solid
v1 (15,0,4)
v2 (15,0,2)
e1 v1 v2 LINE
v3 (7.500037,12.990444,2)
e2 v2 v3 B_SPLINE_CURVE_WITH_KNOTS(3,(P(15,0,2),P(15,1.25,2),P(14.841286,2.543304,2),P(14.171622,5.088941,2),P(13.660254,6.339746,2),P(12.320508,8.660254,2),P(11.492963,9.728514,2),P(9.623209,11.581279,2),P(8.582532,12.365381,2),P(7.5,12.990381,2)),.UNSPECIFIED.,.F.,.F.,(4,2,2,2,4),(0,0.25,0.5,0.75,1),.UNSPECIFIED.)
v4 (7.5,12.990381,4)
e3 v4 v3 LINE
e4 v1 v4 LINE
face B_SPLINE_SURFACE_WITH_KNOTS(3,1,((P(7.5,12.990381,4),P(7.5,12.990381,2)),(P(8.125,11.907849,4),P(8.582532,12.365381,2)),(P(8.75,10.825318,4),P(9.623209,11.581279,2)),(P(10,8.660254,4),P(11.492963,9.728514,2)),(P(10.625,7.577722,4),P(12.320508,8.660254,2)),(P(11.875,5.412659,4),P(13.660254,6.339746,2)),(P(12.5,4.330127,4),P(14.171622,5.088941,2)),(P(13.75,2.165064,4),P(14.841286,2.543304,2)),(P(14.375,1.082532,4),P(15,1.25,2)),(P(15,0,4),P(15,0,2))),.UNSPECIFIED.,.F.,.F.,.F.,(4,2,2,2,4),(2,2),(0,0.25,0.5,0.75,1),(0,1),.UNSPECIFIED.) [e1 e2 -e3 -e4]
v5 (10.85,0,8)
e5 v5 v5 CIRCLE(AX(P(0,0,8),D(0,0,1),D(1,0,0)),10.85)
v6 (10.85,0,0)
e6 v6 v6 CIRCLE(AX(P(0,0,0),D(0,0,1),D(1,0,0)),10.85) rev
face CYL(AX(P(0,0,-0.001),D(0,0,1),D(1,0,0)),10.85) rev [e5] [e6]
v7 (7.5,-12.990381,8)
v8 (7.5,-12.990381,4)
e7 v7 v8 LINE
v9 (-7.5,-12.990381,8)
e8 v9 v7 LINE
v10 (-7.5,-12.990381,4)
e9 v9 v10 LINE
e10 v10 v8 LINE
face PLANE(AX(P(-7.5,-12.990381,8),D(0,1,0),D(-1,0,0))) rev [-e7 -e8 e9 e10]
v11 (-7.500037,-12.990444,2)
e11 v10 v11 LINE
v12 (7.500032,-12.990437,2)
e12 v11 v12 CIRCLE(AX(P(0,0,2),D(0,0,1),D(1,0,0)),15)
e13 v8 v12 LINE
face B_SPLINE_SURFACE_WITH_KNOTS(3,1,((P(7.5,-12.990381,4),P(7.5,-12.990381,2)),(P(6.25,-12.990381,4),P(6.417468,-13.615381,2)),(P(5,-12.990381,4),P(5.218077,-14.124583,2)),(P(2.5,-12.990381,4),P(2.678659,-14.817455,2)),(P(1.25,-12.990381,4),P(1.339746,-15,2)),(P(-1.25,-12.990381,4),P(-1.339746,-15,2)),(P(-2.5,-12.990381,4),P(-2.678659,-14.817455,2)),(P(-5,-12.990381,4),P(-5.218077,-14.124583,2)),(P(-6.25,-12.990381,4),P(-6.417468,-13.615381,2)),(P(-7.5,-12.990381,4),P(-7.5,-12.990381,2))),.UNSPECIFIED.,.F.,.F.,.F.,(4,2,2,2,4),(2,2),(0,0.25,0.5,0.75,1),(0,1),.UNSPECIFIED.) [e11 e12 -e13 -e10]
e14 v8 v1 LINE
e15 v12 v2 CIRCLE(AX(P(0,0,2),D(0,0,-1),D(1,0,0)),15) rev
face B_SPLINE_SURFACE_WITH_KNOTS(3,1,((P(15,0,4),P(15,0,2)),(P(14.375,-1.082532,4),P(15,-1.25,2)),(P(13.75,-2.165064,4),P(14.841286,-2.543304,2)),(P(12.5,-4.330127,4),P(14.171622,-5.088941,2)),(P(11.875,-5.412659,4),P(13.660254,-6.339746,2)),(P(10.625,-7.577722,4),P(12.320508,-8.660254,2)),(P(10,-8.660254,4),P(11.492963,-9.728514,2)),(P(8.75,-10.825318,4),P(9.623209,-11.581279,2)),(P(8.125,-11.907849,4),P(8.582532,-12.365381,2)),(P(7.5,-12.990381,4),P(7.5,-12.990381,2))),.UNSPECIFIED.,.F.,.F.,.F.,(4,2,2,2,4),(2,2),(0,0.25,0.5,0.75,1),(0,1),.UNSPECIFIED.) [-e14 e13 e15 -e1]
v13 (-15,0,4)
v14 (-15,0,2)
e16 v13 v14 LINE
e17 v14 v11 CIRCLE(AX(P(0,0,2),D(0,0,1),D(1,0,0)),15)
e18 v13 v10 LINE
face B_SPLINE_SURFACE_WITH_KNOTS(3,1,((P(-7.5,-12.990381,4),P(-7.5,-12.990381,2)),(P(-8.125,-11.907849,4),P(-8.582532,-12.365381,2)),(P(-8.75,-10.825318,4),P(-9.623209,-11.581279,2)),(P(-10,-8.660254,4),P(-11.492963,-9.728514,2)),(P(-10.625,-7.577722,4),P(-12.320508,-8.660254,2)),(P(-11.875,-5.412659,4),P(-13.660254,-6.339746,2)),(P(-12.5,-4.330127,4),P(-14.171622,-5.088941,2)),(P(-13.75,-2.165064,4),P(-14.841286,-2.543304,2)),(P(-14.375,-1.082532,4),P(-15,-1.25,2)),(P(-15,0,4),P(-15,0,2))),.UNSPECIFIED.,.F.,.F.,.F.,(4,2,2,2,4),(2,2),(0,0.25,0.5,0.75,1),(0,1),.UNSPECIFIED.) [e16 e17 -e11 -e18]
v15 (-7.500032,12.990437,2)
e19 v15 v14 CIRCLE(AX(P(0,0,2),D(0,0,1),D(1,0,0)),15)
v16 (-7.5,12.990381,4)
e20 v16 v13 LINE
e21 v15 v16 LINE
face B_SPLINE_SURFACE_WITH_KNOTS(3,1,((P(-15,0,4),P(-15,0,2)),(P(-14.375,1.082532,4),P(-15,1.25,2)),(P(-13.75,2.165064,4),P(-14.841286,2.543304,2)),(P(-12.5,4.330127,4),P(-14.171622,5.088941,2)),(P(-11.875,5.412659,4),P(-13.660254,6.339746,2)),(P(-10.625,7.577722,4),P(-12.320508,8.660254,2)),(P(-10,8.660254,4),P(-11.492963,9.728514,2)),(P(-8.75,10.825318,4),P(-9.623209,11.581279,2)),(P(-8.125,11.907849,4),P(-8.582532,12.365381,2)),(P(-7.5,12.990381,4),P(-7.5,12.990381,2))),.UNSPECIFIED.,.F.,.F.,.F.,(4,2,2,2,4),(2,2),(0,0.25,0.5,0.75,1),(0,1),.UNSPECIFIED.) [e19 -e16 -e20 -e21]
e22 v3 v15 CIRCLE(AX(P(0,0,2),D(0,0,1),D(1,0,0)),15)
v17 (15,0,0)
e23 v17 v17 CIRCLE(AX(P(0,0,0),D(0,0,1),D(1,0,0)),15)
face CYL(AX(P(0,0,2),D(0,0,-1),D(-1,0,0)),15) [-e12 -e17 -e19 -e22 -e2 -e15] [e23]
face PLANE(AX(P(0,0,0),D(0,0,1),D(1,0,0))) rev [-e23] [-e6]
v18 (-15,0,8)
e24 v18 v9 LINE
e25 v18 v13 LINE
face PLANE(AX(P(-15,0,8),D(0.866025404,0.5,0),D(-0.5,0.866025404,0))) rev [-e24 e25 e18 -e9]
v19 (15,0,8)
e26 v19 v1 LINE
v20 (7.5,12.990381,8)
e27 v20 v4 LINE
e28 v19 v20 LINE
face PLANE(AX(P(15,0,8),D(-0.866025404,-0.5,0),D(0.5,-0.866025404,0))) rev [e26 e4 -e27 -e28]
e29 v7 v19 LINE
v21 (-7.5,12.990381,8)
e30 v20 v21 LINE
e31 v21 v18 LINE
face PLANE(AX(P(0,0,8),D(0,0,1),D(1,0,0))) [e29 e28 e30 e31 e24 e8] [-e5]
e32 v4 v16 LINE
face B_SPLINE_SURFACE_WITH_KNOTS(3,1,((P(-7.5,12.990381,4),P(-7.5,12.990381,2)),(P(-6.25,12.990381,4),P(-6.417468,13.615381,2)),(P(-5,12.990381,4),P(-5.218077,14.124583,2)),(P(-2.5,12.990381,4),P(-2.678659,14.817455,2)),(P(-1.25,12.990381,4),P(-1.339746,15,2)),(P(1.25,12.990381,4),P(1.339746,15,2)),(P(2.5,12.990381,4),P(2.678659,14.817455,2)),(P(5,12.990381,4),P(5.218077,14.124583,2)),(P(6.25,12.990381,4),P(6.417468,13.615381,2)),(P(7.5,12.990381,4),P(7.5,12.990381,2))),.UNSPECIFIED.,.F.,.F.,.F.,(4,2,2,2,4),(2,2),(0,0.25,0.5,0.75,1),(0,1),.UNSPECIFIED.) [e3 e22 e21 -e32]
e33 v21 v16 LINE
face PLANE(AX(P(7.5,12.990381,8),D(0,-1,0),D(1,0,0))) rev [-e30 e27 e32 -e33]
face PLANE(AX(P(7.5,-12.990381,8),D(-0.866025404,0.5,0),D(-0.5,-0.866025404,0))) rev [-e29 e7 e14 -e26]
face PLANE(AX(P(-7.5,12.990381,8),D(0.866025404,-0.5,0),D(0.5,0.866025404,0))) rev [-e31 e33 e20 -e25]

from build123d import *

# Parameters (mm, degrees)
ESQUISSE1_R             = 15
BOSS_EXTRU_1_DEPTH      = 2
BOSS_EXTRU_2_DEPTH      = 4
ENL_V_MAT_EXTRU_1_REACH = 24.672
ESQUISSE4_R             = 10.85


with BuildPart() as part:
    # Esquisse1 → Boss.-Extru.1 (new body)
    with BuildSketch(Plane.XY):
        Circle(ESQUISSE1_R)
    extrude(amount=BOSS_EXTRU_1_DEPTH)

    # Lissage1: read off the stored shape, not the designer's step
    # Lissage1: loft between two sections, ruled curve by curve
    lissage1_from = [
        Edge.make_bspline([(-7.5, 12.990381057, 4), (-6.25, 12.990381057, 4), (-5, 12.990381057, 4), (-2.5, 12.990381057, 4), (-1.25, 12.990381057, 4), (1.25, 12.990381057, 4), (2.5, 12.990381057, 4), (5, 12.990381057, 4), (6.25, 12.990381057, 4), (7.5, 12.990381057, 4)], [0, 0, 0, 0, 0.25, 0.25, 0.5, 0.5, 0.75, 0.75, 1, 1, 1, 1], 3),
        Edge.make_bspline([(7.5, 12.990381057, 4), (8.125, 11.907849302, 4), (8.75, 10.825317547, 4), (10, 8.660254038, 4), (10.625, 7.577722283, 4), (11.875, 5.412658774, 4), (12.5, 4.330127019, 4), (13.75, 2.165063509, 4), (14.375, 1.082531755, 4), (15, 0, 4)], [0, 0, 0, 0, 0.25, 0.25, 0.5, 0.5, 0.75, 0.75, 1, 1, 1, 1], 3),
        Edge.make_bspline([(-15, 0, 4), (-14.375, 1.082531755, 4), (-13.75, 2.165063509, 4), (-12.5, 4.330127019, 4), (-11.875, 5.412658774, 4), (-10.625, 7.577722283, 4), (-10, 8.660254038, 4), (-8.75, 10.825317547, 4), (-8.125, 11.907849302, 4), (-7.5, 12.990381057, 4)], [0, 0, 0, 0, 0.25, 0.25, 0.5, 0.5, 0.75, 0.75, 1, 1, 1, 1], 3),
        Edge.make_bspline([(15, 0, 4), (14.375, -1.082531755, 4), (13.75, -2.165063509, 4), (12.5, -4.330127019, 4), (11.875, -5.412658774, 4), (10.625, -7.577722283, 4), (10, -8.660254038, 4), (8.75, -10.825317547, 4), (8.125, -11.907849302, 4), (7.5, -12.990381057, 4)], [0, 0, 0, 0, 0.25, 0.25, 0.5, 0.5, 0.75, 0.75, 1, 1, 1, 1], 3),
        Edge.make_bspline([(7.5, -12.990381057, 4), (6.25, -12.990381057, 4), (5, -12.990381057, 4), (2.5, -12.990381057, 4), (1.25, -12.990381057, 4), (-1.25, -12.990381057, 4), (-2.5, -12.990381057, 4), (-5, -12.990381057, 4), (-6.25, -12.990381057, 4), (-7.5, -12.990381057, 4)], [0, 0, 0, 0, 0.25, 0.25, 0.5, 0.5, 0.75, 0.75, 1, 1, 1, 1], 3),
        Edge.make_bspline([(-7.5, -12.990381057, 4), (-8.125, -11.907849302, 4), (-8.75, -10.825317547, 4), (-10, -8.660254038, 4), (-10.625, -7.577722283, 4), (-11.875, -5.412658774, 4), (-12.5, -4.330127019, 4), (-13.75, -2.165063509, 4), (-14.375, -1.082531755, 4), (-15, 0, 4)], [0, 0, 0, 0, 0.25, 0.25, 0.5, 0.5, 0.75, 0.75, 1, 1, 1, 1], 3),
    ]
    lissage1_to = [
        Edge.make_bspline([(-7.5, 12.990381057, 2), (-6.417468245, 13.615381057, 2), (-5.218076906, 14.124583256, 2), (-2.678658838, 14.817454761, 2), (-1.339745962, 15, 2), (1.339745962, 15, 2), (2.678658838, 14.817454761, 2), (5.218076906, 14.124583256, 2), (6.417468245, 13.615381057, 2), (7.5, 12.990381057, 2)], [0, 0, 0, 0, 0.25, 0.25, 0.5, 0.5, 0.75, 0.75, 1, 1, 1, 1], 3),
        Edge.make_bspline([(7.5, 12.990381057, 2), (8.582531755, 12.365381057, 2), (9.623209465, 11.581278787, 2), (11.492962823, 9.728513982, 2), (12.320508076, 8.660254038, 2), (13.660254038, 6.339745962, 2), (14.171621661, 5.088940779, 2), (14.841286371, 2.543304469, 2), (15, 1.25, 2), (15, 0, 2)], [0, 0, 0, 0, 0.25, 0.25, 0.5, 0.5, 0.75, 0.75, 1, 1, 1, 1], 3),
        Edge.make_bspline([(-15, 0, 2), (-15, 1.25, 2), (-14.841286371, 2.543304469, 2), (-14.171621661, 5.088940779, 2), (-13.660254038, 6.339745962, 2), (-12.320508076, 8.660254038, 2), (-11.492962823, 9.728513982, 2), (-9.623209465, 11.581278787, 2), (-8.582531755, 12.365381057, 2), (-7.5, 12.990381057, 2)], [0, 0, 0, 0, 0.25, 0.25, 0.5, 0.5, 0.75, 0.75, 1, 1, 1, 1], 3),
        Edge.make_bspline([(15, 0, 2), (15, -1.25, 2), (14.841286371, -2.543304469, 2), (14.171621661, -5.088940779, 2), (13.660254038, -6.339745962, 2), (12.320508076, -8.660254038, 2), (11.492962823, -9.728513982, 2), (9.623209465, -11.581278787, 2), (8.582531755, -12.365381057, 2), (7.5, -12.990381057, 2)], [0, 0, 0, 0, 0.25, 0.25, 0.5, 0.5, 0.75, 0.75, 1, 1, 1, 1], 3),
        Edge.make_bspline([(7.5, -12.990381057, 2), (6.417468245, -13.615381057, 2), (5.218076906, -14.124583256, 2), (2.678658838, -14.817454761, 2), (1.339745962, -15, 2), (-1.339745962, -15, 2), (-2.678658838, -14.817454761, 2), (-5.218076906, -14.124583256, 2), (-6.417468245, -13.615381057, 2), (-7.5, -12.990381057, 2)], [0, 0, 0, 0, 0.25, 0.25, 0.5, 0.5, 0.75, 0.75, 1, 1, 1, 1], 3),
        Edge.make_bspline([(-7.5, -12.990381057, 2), (-8.582531755, -12.365381057, 2), (-9.623209465, -11.581278787, 2), (-11.492962823, -9.728513982, 2), (-12.320508076, -8.660254038, 2), (-13.660254038, -6.339745962, 2), (-14.171621661, -5.088940779, 2), (-14.841286371, -2.543304469, 2), (-15, -1.25, 2), (-15, 0, 2)], [0, 0, 0, 0, 0.25, 0.25, 0.5, 0.5, 0.75, 0.75, 1, 1, 1, 1], 3),
    ]
    lissage1 = Solid(Shell([*[Face.make_surface_from_curves(lissage1_from[k], lissage1_to[k]) for k in range(6)], Face(Wire(lissage1_from)), Face(Wire(lissage1_to))]))
    add(lissage1)

    # Esquisse3 → Boss.-Extru.2 (add)
    with BuildSketch(Plane.XY.offset(4)):
        Polygon((7.5, -12.990381057), (15, 0), (7.5, 12.990381057), (-7.5, 12.990381057), (-15, 0), (-7.5, -12.990381057), align=None)
    extrude(amount=BOSS_EXTRU_2_DEPTH)

    # Esquisse4 → Enlèv. mat.-Extru.1 (cut, up to next)
    with BuildSketch(Plane.XY.offset(8), mode=Mode.PRIVATE) as enl_v_mat_extru_1_sk1:
        Circle(ESQUISSE4_R)
    enl_v_mat_extru_1_tool1 = extrude(enl_v_mat_extru_1_sk1.sketch, amount=-ENL_V_MAT_EXTRU_1_REACH, mode=Mode.PRIVATE) & part.part
    add(enl_v_mat_extru_1_tool1.solids().sort_by_distance((0, 0, 8))[0], mode=Mode.SUBTRACT)


solid = part.part
